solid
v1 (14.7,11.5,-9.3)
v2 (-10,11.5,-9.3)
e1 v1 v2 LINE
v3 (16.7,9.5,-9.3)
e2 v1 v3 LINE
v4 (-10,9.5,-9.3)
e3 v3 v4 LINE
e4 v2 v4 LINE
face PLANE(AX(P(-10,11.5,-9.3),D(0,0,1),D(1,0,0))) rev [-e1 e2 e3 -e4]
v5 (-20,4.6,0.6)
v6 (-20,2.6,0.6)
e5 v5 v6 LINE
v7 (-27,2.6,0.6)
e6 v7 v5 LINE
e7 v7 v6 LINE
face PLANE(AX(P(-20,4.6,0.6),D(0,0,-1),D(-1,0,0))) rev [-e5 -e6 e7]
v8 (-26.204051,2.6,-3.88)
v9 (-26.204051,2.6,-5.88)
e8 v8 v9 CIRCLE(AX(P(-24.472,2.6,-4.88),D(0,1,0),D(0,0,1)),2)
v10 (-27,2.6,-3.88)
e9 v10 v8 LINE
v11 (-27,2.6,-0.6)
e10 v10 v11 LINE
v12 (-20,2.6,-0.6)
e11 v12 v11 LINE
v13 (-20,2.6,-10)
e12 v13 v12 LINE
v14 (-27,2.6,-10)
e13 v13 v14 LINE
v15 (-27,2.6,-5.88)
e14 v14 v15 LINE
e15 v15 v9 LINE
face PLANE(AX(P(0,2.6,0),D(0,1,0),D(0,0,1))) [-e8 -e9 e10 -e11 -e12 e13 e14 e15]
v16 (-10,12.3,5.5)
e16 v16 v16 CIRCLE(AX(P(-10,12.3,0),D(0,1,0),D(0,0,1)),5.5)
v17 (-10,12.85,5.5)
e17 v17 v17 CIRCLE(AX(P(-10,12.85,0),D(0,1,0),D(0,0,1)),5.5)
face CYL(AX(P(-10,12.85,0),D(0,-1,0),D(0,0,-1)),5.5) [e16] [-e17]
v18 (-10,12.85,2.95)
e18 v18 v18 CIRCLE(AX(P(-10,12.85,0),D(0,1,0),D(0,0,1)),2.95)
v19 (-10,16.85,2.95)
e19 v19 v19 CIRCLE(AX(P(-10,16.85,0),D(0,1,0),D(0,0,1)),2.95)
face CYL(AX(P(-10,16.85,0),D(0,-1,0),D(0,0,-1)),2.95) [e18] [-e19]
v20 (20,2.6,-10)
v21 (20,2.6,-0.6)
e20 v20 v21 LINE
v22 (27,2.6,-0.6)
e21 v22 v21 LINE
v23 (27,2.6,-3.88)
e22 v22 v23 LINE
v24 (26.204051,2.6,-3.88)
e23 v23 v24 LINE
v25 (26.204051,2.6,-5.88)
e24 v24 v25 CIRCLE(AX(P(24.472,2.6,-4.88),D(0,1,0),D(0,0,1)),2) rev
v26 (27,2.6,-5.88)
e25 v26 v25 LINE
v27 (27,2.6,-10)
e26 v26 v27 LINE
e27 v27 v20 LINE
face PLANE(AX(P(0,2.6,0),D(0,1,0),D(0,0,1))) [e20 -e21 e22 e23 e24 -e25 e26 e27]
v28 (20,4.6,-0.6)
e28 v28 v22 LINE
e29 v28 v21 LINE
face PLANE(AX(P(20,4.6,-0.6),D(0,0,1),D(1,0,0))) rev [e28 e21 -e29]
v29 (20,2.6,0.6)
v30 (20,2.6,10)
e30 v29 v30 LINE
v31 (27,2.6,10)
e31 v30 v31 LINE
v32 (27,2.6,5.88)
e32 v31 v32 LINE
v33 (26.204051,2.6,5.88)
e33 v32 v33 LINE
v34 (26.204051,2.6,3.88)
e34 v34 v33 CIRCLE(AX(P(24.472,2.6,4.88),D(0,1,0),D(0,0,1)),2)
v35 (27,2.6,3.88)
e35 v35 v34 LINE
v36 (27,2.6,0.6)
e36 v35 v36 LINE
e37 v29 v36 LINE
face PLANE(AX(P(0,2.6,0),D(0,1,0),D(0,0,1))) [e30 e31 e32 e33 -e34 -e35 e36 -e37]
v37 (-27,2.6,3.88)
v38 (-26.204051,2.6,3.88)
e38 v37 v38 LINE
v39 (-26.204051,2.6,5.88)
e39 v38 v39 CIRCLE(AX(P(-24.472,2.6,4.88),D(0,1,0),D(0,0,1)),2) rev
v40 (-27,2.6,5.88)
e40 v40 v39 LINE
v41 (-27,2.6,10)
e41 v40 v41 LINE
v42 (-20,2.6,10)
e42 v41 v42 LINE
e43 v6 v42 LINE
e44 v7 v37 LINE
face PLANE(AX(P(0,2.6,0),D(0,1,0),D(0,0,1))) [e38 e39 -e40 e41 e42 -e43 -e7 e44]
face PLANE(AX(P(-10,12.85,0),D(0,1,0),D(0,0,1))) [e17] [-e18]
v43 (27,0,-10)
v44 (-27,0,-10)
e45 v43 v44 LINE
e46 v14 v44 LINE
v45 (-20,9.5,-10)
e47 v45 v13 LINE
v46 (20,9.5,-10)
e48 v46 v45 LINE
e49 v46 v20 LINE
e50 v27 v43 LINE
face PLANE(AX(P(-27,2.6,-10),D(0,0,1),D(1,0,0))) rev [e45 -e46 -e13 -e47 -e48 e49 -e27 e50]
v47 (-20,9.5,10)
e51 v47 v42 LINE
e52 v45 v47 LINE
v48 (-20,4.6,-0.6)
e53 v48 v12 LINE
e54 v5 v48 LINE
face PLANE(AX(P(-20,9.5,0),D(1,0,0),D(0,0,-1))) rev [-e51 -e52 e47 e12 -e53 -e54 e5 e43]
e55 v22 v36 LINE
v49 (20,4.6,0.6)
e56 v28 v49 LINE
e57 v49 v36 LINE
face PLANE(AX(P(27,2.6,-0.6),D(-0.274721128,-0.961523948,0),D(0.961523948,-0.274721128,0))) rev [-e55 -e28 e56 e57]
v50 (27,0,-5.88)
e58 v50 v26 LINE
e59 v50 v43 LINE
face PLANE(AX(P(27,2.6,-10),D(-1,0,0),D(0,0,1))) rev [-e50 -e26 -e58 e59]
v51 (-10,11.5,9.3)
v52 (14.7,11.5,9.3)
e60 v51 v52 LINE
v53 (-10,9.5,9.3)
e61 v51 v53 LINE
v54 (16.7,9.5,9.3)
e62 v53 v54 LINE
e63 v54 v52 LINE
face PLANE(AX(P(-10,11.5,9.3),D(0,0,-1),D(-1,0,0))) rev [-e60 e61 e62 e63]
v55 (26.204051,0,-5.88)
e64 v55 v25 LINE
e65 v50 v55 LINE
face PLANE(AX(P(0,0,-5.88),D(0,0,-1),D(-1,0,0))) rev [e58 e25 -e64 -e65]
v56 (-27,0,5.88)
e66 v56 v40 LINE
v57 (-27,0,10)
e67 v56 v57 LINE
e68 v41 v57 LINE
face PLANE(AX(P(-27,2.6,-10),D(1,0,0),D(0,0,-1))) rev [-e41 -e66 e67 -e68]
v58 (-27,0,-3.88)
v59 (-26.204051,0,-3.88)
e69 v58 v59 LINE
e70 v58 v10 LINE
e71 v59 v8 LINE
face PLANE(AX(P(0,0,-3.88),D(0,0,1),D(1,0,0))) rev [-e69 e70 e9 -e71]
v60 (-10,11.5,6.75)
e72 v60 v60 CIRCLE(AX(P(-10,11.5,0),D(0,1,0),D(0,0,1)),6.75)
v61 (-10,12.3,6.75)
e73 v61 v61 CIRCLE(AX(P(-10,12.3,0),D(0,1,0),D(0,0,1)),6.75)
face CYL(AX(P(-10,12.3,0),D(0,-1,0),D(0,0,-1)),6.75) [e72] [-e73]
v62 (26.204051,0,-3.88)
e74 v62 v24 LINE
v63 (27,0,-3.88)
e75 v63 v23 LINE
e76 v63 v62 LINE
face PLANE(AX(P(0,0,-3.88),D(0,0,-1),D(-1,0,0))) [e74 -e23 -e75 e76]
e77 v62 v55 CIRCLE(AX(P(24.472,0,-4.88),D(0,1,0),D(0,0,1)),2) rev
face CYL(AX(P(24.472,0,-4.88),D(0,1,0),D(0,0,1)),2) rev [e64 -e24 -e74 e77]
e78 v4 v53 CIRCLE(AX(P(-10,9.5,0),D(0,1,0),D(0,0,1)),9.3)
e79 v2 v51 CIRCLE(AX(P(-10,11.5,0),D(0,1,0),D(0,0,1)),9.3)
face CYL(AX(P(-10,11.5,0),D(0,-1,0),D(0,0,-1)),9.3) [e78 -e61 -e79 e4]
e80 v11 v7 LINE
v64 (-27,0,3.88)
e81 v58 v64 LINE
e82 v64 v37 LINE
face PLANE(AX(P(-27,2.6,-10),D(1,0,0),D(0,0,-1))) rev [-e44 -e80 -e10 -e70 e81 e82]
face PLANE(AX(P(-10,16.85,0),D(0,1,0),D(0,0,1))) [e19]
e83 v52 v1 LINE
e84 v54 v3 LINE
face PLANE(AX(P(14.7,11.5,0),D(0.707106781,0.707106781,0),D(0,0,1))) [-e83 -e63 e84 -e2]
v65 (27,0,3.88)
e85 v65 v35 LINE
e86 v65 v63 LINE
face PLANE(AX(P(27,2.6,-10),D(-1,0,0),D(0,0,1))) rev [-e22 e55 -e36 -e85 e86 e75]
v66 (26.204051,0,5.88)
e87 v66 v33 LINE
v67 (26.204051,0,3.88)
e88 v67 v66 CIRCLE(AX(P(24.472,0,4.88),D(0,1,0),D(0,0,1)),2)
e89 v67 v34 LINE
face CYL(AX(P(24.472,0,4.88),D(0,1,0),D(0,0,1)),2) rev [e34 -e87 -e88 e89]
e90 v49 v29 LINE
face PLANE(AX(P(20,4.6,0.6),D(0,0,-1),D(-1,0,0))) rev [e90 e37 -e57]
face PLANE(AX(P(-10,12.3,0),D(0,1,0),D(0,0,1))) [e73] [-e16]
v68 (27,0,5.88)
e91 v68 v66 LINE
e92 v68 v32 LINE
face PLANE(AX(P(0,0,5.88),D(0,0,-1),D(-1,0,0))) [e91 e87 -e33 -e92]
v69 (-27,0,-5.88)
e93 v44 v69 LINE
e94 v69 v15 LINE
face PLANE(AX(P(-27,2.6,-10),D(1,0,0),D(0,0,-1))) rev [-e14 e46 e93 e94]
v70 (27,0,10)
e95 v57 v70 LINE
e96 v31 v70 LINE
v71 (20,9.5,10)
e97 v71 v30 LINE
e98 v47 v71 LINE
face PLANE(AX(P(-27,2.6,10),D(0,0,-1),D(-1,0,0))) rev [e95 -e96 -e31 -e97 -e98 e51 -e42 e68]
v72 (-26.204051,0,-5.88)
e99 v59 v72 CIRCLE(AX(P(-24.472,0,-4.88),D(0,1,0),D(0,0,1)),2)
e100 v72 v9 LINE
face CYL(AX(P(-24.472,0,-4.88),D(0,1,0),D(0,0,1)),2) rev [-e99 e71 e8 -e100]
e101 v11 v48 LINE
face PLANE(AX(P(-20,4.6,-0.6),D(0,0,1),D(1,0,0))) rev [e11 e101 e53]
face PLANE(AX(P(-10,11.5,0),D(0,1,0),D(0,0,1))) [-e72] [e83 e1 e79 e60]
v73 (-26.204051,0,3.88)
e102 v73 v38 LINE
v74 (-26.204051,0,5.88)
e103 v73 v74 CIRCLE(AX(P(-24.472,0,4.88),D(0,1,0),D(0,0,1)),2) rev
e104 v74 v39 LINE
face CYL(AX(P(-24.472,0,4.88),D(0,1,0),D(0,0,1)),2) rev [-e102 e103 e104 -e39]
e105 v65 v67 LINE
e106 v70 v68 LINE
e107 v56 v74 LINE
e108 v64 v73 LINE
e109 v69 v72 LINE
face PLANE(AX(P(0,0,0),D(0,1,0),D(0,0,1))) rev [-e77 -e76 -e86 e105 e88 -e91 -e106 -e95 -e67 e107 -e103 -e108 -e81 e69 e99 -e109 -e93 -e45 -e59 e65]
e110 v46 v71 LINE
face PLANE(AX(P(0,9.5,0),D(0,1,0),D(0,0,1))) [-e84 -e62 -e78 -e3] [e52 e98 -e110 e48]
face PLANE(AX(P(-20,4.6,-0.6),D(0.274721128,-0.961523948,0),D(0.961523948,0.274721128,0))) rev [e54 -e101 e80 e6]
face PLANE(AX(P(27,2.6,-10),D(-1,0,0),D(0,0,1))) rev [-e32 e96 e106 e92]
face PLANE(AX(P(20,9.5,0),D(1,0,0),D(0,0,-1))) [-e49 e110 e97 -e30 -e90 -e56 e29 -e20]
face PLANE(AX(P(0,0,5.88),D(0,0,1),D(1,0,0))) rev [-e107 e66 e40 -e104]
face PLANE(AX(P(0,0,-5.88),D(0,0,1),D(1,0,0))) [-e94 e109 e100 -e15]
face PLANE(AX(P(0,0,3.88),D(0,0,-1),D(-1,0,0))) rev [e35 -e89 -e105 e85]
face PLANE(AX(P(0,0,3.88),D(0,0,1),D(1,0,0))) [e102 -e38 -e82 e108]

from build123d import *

# Parameters (mm, degrees)
CROQUIS_BASE_W           = 54
CROQUIS_BASE_H           = 20
SALIENTE_EXTRUIR1_DEPTH  = 2.6
CORTAR_EXTRUIR1_DEPTH    = 2.6
CROQUIS_STEP_2_3_W       = 40
CROQUIS_STEP_2_3_H       = 20
SALIENTE_EXTRUIR2_DEPTH  = 6.9
SALIENTE_EXTRUIR5_DEPTH  = 2
CROQUIS5_W               = 7
CROQUIS5_H               = 1.2
SALIENTE_EXTRUIR6_DEPTH  = 2
CROQUIS3_W               = 7
CROQUIS3_H               = 1.2
SALIENTE_EXTRUIR7_DEPTH  = 2
CORTAR_EXTRUIR4_DEPTH    = 1.2
CORTAR_EXTRUIR5_DEPTH    = 1.2
CROQUIS10_R              = 6.75
SALIENTE_EXTRUIR8_DEPTH  = 0.8
CROQUIS11_R              = 5.5
SALIENTE_EXTRUIR9_DEPTH  = 0.55
CHAFL_N1_START           = 18.526197667
CHAFL_N1_OUTLINE_W       = 2.828427125
CHAFL_N1_OUTLINE_H       = 18.6
CHAFL_N1_DEPTH           = 2.473802333
CROQUIS12_R              = 2.95
SALIENTE_EXTRUIR10_DEPTH = 4


with BuildPart() as part:
    # Croquis base → Saliente-Extruir1 (new body)
    with BuildSketch(Plane(origin=(0, 0, 0), x_dir=(1, 0, 0), z_dir=(0, 1, 0))):
        Rectangle(CROQUIS_BASE_W, CROQUIS_BASE_H)
    extrude(amount=SALIENTE_EXTRUIR1_DEPTH)

    # Croquis step 2 → Cortar-Extruir1 (cut)
    with BuildSketch(Plane(origin=(0, 2.6, 0), x_dir=(1, 0, 0), z_dir=(0, 1, 0))):
        with BuildLine():
            Line((-26.204050808, 5.88), (-27, 5.88))
            Line((-27, 5.88), (-27, 3.88))
            Line((-27, 3.88), (-26.204050808, 3.88))
            ThreePointArc((-26.204050808, 3.88), (-22.472, 4.88), (-26.204050808, 5.88))
        make_face()
        with BuildLine():
            Line((-26.204050808, -3.88), (-27, -3.88))
            Line((-27, -3.88), (-27, -5.88))
            Line((-27, -5.88), (-26.204050808, -5.88))
            ThreePointArc((-26.204050808, -5.88), (-22.472, -4.88), (-26.204050808, -3.88))
        make_face()
        with BuildLine():
            Line((26.204050808, 3.88), (27, 3.88))
            Line((27, 3.88), (27, 5.88))
            Line((27, 5.88), (26.204050808, 5.88))
            ThreePointArc((26.204050808, 5.88), (22.472, 4.88), (26.204050808, 3.88))
        make_face()
        with BuildLine():
            Line((26.204050808, -5.88), (27, -5.88))
            Line((27, -5.88), (27, -3.88))
            Line((27, -3.88), (26.204050808, -3.88))
            ThreePointArc((26.204050808, -3.88), (22.472, -4.88), (26.204050808, -5.88))
        make_face()
    extrude(amount=-CORTAR_EXTRUIR1_DEPTH, mode=Mode.SUBTRACT)

    # Croquis step 2<3> → Saliente-Extruir2 (add)
    with BuildSketch(Plane(origin=(0, 2.6, 0), x_dir=(1, 0, 0), z_dir=(0, 1, 0))):
        Rectangle(CROQUIS_STEP_2_3_W, CROQUIS_STEP_2_3_H)
    extrude(amount=SALIENTE_EXTRUIR2_DEPTH)

    # Croquis7 → Saliente-Extruir5 (add)
    with BuildSketch(Plane(origin=(0, 9.5, 0), x_dir=(1, 0, 0), z_dir=(0, 1, 0))):
        with BuildLine():
            Line((-10, 9.3), (16.7, 9.3))
            Line((16.7, 9.3), (16.7, -9.3))
            Line((16.7, -9.3), (-10, -9.3))
            ThreePointArc((-10, -9.3), (-19.3, 0), (-10, 9.3))
        make_face()
    extrude(amount=SALIENTE_EXTRUIR5_DEPTH)

    # Croquis5 → Saliente-Extruir6 (add)
    with BuildSketch(Plane(origin=(0, 2.6, 0), x_dir=(1, 0, 0), z_dir=(0, 1, 0))):
        with Locations((23.5, 0)):
            Rectangle(CROQUIS5_W, CROQUIS5_H)
    extrude(amount=SALIENTE_EXTRUIR6_DEPTH)

    # Croquis3 → Saliente-Extruir7 (add)
    with BuildSketch(Plane(origin=(0, 2.6, 0), x_dir=(1, 0, 0), z_dir=(0, 1, 0))):
        with Locations((-23.5, 0)):
            Rectangle(CROQUIS3_W, CROQUIS3_H)
    extrude(amount=SALIENTE_EXTRUIR7_DEPTH)

    # Croquis8 → Cortar-Extruir4 (cut)
    with BuildSketch(Plane.XY.offset(0.6)):
        Polygon((-27, 2.6), (-27, 4.6), (-20, 4.6), align=None)
    extrude(amount=-CORTAR_EXTRUIR4_DEPTH, mode=Mode.SUBTRACT)

    # Croquis9 → Cortar-Extruir5 (cut)
    with BuildSketch(Plane.XY.offset(0.6)):
        Polygon((27, 2.6), (20, 4.6), (27, 4.6), align=None)
    extrude(amount=-CORTAR_EXTRUIR5_DEPTH, mode=Mode.SUBTRACT)

    # Croquis10 → Saliente-Extruir8 (add)
    with BuildSketch(Plane(origin=(0, 11.5, 0), x_dir=(1, 0, 0), z_dir=(0, 1, 0))):
        with Locations(Location((-10, 0, 0), (0, 0, 270))):
            Circle(CROQUIS10_R)
    extrude(amount=SALIENTE_EXTRUIR8_DEPTH)

    # Croquis11 → Saliente-Extruir9 (add)
    with BuildSketch(Plane(origin=(0, 12.3, 0), x_dir=(1, 0, 0), z_dir=(0, 1, 0))):
        with Locations(Location((-10, 0, 0), (0, 0, 270))):
            Circle(CROQUIS11_R)
    extrude(amount=SALIENTE_EXTRUIR9_DEPTH)

    # Chaflán1: read off the stored shape, not the designer's step
    # Chaflán1 outline → Chaflán1 (cut)
    with BuildSketch(Plane(origin=(0, 0, 0), x_dir=(0.707106781186548, -0.707106781186547, 0), z_dir=(0.707106781186547, 0.707106781186548, 0)).offset(CHAFL_N1_START)):
        with Locations((3.676955263, 0)):
            Rectangle(CHAFL_N1_OUTLINE_W, CHAFL_N1_OUTLINE_H)
    extrude(amount=CHAFL_N1_DEPTH, mode=Mode.SUBTRACT)

    # Croquis12 → Saliente-Extruir10 (add)
    with BuildSketch(Plane(origin=(0, 12.85, 0), x_dir=(1, 0, 0), z_dir=(0, 1, 0))):
        with Locations(Location((-10, 0, 0), (0, 0, 270))):
            Circle(CROQUIS12_R)
    extrude(amount=SALIENTE_EXTRUIR10_DEPTH)


solid = part.part
